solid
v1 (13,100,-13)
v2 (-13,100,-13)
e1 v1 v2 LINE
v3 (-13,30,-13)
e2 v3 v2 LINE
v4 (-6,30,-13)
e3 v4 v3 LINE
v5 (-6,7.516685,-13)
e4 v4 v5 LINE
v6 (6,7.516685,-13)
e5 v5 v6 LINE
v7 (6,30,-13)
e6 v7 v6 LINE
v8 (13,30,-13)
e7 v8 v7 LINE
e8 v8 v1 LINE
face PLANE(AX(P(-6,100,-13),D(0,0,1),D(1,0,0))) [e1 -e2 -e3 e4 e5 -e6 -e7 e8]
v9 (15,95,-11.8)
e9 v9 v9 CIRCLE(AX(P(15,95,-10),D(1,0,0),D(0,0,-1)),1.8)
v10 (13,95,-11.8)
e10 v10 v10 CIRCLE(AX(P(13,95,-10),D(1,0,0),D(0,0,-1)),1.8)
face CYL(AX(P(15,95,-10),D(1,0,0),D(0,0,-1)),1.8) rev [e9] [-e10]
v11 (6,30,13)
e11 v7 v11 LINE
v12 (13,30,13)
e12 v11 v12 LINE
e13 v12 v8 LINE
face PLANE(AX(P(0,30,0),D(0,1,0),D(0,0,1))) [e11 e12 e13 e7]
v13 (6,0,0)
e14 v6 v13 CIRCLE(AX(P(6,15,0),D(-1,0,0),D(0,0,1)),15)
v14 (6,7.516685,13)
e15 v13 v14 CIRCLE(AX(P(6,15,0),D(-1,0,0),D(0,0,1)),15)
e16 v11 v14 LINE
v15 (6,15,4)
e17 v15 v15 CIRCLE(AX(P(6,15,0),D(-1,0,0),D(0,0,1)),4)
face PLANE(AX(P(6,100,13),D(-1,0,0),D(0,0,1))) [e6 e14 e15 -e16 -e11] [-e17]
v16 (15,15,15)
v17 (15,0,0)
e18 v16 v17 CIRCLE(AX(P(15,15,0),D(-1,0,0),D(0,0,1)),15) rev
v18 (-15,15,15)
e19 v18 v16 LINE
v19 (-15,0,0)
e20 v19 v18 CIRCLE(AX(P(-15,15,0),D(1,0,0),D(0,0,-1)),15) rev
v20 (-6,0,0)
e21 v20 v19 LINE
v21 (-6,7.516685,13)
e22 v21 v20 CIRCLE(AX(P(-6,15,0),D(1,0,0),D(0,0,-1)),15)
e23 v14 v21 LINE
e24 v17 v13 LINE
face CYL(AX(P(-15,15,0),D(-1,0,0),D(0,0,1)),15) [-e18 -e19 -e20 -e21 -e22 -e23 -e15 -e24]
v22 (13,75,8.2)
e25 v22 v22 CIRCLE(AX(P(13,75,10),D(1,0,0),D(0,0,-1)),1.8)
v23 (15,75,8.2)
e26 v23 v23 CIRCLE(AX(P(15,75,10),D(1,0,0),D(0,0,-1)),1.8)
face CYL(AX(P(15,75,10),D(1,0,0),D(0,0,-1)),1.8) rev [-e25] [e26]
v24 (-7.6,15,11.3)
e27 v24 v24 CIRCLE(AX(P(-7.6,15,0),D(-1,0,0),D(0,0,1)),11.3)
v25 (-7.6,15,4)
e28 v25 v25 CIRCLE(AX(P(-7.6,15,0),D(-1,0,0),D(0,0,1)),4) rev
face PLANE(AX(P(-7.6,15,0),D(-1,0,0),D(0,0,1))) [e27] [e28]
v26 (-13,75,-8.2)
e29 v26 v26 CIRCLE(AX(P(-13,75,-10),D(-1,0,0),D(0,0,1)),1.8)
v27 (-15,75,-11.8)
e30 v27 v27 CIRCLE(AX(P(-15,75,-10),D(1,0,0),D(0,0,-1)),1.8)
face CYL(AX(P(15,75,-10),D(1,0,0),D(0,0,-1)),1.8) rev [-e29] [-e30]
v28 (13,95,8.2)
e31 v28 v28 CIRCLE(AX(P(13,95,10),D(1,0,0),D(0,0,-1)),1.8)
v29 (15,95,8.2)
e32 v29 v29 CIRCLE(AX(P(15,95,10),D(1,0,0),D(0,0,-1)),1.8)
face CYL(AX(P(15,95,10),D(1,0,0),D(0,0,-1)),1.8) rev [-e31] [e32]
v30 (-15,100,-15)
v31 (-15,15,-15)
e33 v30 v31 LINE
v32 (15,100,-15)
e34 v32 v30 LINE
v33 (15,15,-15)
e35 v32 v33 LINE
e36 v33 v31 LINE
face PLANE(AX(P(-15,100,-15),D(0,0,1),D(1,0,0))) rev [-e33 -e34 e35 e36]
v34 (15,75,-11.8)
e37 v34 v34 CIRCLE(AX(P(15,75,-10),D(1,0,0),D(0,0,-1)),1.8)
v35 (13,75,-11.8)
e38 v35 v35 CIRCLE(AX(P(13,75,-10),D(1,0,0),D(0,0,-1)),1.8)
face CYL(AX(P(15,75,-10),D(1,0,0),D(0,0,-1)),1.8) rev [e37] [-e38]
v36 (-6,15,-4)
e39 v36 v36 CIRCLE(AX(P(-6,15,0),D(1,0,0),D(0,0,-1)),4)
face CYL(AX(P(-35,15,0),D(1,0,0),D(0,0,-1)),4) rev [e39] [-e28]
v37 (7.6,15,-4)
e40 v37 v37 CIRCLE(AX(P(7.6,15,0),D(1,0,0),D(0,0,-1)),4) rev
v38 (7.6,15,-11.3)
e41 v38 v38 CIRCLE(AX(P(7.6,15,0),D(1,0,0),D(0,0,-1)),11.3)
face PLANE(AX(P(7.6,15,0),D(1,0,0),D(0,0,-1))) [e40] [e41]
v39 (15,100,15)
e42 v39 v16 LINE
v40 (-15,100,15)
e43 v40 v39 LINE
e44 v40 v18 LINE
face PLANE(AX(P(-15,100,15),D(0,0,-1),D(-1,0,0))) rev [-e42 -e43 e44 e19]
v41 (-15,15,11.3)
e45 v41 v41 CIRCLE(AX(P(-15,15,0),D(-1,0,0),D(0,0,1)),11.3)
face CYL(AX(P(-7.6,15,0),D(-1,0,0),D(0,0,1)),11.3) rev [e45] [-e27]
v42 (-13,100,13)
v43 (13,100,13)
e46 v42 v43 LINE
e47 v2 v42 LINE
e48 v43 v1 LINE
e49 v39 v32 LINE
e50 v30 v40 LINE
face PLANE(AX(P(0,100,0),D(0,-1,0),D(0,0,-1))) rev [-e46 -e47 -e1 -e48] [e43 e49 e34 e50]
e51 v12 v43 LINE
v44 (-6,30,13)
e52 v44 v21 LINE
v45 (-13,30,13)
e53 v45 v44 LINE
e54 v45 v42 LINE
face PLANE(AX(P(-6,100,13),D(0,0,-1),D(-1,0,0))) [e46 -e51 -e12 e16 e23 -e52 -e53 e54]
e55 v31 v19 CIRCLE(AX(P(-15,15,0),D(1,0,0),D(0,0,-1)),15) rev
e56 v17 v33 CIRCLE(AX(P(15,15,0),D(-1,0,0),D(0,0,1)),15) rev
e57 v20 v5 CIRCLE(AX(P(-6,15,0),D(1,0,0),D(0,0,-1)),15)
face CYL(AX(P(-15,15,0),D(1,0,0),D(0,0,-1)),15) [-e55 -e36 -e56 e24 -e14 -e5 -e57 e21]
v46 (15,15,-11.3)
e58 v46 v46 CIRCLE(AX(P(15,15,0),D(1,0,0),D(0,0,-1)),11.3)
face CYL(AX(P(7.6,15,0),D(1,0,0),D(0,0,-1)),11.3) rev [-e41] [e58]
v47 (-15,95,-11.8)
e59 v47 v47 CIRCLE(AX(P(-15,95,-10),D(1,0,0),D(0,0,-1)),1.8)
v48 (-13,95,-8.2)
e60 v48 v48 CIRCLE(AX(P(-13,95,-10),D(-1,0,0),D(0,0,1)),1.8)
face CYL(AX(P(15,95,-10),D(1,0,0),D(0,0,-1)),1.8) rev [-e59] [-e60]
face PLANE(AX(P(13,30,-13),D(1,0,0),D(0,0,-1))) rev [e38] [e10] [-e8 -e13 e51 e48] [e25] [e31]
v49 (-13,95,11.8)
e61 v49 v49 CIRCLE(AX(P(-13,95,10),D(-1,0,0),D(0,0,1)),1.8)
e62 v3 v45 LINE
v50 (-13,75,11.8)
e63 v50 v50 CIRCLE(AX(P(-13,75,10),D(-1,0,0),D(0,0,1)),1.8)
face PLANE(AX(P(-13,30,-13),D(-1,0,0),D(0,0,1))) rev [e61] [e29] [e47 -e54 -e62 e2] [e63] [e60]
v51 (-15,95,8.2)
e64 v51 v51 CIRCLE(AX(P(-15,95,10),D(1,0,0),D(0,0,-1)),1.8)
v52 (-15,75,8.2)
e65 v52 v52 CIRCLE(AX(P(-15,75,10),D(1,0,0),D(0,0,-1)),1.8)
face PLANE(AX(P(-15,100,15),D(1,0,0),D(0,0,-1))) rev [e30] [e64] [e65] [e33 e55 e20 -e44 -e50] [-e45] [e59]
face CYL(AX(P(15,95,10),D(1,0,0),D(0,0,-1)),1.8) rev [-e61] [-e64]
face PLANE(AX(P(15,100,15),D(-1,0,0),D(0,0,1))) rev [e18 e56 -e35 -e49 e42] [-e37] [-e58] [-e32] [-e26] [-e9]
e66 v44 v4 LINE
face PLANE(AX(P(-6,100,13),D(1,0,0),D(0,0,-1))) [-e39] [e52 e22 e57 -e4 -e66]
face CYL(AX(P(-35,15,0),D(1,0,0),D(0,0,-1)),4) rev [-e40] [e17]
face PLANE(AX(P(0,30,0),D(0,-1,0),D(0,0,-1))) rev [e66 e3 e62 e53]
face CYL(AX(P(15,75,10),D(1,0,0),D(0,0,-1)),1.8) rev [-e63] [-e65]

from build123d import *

# Parameters (mm, degrees)
SKETCH1_W            = 30
SKETCH1_H            = 30
SKETCH1_W_2          = 12
SKETCH1_H_2          = 26
BOSS_EXTRUDE2_DEPTH  = 100
SKETCH3_W            = 7
SKETCH3_H            = 26
CUT_EXTRUDE2_DEPTH   = 70
FILLET1_R            = 15
SKETCH5_R            = 4
CUT_EXTRUDE3_DEPTH   = 50
SKETCH6_R            = 11.3
CUT_EXTRUDE4_DEPTH   = 7.4
CUT_EXTRUDE5_START   = -7.4
SKETCH7_R            = 11.3
CUT_EXTRUDE5_DEPTH   = 7.4
M3_CLEARANCE_HOLE1_D = 3.6


with BuildPart() as part:
    # Sketch1 → Boss-Extrude2 (new body)
    with BuildSketch(Plane(origin=(0, 0, 0), x_dir=(1, 0, 0), z_dir=(0, 1, 0))):
        Rectangle(SKETCH1_W, SKETCH1_H)
        Rectangle(SKETCH1_W_2, SKETCH1_H_2, mode=Mode.SUBTRACT)
    extrude(amount=BOSS_EXTRUDE2_DEPTH)

    # Sketch3 → Cut-Extrude2 (cut)
    with BuildSketch(Plane(origin=(0, 100, 0), x_dir=(1, 0, 0), z_dir=(0, 1, 0))):
        with Locations((-9.5, 0)):
            Rectangle(SKETCH3_W, SKETCH3_H)
        with Locations((9.5, 0)):
            Rectangle(SKETCH3_W, SKETCH3_H)
    extrude(amount=-CUT_EXTRUDE2_DEPTH, mode=Mode.SUBTRACT)

    # Fillet1
    # the kernel refuses this fillet: 15 mm, written as the material it takes off along each edge
    with BuildSketch(Plane(origin=(52.5, 0, -15), x_dir=(0, 1, 0), z_dir=(-1, 0, 0)), Plane(origin=(-52.5, 0, 15), x_dir=(0, 1, 0), z_dir=(1, 0, 0))) as fillet1_piece_1:
        with BuildLine():
            CenterArc((FILLET1_R, -FILLET1_R), FILLET1_R, 90, 90)
            Line((0, -FILLET1_R), (0, 0))
            Line((0, 0), (FILLET1_R, 0))
        make_face()
    extrude(amount=105, mode=Mode.SUBTRACT)

    # Sketch5 → Cut-Extrude3 (cut)
    with BuildSketch(Plane(origin=(15, 0, 0), x_dir=(0, 0, -1), z_dir=(1, 0, 0))):
        with Locations((0, 15)):
            Circle(SKETCH5_R)
    extrude(amount=-CUT_EXTRUDE3_DEPTH, mode=Mode.SUBTRACT)

    # Sketch6 → Cut-Extrude4 (cut)
    with BuildSketch(Plane(origin=(15, 0, 0), x_dir=(0, 0, -1), z_dir=(1, 0, 0))):
        with Locations((0, 15)):
            Circle(SKETCH6_R)
    extrude(amount=-CUT_EXTRUDE4_DEPTH, mode=Mode.SUBTRACT)

    # Sketch7 → Cut-Extrude5 (cut)
    with BuildSketch(Plane.ZY.offset(15).offset(CUT_EXTRUDE5_START)):
        with Locations(Location((0, 15, 0), (0, 0, 180))):
            Circle(SKETCH7_R)
    extrude(amount=CUT_EXTRUDE5_DEPTH, mode=Mode.SUBTRACT)

    # M3 Clearance Hole1 (through all)
    with Locations(Plane(origin=(15, 0, 0), x_dir=(0, 0, -1), z_dir=(1, 0, 0))):
        with Locations((-10, 95), (-10, 75), (10, 75), (10, 95)):
            Hole(M3_CLEARANCE_HOLE1_D / 2)


solid = part.part
